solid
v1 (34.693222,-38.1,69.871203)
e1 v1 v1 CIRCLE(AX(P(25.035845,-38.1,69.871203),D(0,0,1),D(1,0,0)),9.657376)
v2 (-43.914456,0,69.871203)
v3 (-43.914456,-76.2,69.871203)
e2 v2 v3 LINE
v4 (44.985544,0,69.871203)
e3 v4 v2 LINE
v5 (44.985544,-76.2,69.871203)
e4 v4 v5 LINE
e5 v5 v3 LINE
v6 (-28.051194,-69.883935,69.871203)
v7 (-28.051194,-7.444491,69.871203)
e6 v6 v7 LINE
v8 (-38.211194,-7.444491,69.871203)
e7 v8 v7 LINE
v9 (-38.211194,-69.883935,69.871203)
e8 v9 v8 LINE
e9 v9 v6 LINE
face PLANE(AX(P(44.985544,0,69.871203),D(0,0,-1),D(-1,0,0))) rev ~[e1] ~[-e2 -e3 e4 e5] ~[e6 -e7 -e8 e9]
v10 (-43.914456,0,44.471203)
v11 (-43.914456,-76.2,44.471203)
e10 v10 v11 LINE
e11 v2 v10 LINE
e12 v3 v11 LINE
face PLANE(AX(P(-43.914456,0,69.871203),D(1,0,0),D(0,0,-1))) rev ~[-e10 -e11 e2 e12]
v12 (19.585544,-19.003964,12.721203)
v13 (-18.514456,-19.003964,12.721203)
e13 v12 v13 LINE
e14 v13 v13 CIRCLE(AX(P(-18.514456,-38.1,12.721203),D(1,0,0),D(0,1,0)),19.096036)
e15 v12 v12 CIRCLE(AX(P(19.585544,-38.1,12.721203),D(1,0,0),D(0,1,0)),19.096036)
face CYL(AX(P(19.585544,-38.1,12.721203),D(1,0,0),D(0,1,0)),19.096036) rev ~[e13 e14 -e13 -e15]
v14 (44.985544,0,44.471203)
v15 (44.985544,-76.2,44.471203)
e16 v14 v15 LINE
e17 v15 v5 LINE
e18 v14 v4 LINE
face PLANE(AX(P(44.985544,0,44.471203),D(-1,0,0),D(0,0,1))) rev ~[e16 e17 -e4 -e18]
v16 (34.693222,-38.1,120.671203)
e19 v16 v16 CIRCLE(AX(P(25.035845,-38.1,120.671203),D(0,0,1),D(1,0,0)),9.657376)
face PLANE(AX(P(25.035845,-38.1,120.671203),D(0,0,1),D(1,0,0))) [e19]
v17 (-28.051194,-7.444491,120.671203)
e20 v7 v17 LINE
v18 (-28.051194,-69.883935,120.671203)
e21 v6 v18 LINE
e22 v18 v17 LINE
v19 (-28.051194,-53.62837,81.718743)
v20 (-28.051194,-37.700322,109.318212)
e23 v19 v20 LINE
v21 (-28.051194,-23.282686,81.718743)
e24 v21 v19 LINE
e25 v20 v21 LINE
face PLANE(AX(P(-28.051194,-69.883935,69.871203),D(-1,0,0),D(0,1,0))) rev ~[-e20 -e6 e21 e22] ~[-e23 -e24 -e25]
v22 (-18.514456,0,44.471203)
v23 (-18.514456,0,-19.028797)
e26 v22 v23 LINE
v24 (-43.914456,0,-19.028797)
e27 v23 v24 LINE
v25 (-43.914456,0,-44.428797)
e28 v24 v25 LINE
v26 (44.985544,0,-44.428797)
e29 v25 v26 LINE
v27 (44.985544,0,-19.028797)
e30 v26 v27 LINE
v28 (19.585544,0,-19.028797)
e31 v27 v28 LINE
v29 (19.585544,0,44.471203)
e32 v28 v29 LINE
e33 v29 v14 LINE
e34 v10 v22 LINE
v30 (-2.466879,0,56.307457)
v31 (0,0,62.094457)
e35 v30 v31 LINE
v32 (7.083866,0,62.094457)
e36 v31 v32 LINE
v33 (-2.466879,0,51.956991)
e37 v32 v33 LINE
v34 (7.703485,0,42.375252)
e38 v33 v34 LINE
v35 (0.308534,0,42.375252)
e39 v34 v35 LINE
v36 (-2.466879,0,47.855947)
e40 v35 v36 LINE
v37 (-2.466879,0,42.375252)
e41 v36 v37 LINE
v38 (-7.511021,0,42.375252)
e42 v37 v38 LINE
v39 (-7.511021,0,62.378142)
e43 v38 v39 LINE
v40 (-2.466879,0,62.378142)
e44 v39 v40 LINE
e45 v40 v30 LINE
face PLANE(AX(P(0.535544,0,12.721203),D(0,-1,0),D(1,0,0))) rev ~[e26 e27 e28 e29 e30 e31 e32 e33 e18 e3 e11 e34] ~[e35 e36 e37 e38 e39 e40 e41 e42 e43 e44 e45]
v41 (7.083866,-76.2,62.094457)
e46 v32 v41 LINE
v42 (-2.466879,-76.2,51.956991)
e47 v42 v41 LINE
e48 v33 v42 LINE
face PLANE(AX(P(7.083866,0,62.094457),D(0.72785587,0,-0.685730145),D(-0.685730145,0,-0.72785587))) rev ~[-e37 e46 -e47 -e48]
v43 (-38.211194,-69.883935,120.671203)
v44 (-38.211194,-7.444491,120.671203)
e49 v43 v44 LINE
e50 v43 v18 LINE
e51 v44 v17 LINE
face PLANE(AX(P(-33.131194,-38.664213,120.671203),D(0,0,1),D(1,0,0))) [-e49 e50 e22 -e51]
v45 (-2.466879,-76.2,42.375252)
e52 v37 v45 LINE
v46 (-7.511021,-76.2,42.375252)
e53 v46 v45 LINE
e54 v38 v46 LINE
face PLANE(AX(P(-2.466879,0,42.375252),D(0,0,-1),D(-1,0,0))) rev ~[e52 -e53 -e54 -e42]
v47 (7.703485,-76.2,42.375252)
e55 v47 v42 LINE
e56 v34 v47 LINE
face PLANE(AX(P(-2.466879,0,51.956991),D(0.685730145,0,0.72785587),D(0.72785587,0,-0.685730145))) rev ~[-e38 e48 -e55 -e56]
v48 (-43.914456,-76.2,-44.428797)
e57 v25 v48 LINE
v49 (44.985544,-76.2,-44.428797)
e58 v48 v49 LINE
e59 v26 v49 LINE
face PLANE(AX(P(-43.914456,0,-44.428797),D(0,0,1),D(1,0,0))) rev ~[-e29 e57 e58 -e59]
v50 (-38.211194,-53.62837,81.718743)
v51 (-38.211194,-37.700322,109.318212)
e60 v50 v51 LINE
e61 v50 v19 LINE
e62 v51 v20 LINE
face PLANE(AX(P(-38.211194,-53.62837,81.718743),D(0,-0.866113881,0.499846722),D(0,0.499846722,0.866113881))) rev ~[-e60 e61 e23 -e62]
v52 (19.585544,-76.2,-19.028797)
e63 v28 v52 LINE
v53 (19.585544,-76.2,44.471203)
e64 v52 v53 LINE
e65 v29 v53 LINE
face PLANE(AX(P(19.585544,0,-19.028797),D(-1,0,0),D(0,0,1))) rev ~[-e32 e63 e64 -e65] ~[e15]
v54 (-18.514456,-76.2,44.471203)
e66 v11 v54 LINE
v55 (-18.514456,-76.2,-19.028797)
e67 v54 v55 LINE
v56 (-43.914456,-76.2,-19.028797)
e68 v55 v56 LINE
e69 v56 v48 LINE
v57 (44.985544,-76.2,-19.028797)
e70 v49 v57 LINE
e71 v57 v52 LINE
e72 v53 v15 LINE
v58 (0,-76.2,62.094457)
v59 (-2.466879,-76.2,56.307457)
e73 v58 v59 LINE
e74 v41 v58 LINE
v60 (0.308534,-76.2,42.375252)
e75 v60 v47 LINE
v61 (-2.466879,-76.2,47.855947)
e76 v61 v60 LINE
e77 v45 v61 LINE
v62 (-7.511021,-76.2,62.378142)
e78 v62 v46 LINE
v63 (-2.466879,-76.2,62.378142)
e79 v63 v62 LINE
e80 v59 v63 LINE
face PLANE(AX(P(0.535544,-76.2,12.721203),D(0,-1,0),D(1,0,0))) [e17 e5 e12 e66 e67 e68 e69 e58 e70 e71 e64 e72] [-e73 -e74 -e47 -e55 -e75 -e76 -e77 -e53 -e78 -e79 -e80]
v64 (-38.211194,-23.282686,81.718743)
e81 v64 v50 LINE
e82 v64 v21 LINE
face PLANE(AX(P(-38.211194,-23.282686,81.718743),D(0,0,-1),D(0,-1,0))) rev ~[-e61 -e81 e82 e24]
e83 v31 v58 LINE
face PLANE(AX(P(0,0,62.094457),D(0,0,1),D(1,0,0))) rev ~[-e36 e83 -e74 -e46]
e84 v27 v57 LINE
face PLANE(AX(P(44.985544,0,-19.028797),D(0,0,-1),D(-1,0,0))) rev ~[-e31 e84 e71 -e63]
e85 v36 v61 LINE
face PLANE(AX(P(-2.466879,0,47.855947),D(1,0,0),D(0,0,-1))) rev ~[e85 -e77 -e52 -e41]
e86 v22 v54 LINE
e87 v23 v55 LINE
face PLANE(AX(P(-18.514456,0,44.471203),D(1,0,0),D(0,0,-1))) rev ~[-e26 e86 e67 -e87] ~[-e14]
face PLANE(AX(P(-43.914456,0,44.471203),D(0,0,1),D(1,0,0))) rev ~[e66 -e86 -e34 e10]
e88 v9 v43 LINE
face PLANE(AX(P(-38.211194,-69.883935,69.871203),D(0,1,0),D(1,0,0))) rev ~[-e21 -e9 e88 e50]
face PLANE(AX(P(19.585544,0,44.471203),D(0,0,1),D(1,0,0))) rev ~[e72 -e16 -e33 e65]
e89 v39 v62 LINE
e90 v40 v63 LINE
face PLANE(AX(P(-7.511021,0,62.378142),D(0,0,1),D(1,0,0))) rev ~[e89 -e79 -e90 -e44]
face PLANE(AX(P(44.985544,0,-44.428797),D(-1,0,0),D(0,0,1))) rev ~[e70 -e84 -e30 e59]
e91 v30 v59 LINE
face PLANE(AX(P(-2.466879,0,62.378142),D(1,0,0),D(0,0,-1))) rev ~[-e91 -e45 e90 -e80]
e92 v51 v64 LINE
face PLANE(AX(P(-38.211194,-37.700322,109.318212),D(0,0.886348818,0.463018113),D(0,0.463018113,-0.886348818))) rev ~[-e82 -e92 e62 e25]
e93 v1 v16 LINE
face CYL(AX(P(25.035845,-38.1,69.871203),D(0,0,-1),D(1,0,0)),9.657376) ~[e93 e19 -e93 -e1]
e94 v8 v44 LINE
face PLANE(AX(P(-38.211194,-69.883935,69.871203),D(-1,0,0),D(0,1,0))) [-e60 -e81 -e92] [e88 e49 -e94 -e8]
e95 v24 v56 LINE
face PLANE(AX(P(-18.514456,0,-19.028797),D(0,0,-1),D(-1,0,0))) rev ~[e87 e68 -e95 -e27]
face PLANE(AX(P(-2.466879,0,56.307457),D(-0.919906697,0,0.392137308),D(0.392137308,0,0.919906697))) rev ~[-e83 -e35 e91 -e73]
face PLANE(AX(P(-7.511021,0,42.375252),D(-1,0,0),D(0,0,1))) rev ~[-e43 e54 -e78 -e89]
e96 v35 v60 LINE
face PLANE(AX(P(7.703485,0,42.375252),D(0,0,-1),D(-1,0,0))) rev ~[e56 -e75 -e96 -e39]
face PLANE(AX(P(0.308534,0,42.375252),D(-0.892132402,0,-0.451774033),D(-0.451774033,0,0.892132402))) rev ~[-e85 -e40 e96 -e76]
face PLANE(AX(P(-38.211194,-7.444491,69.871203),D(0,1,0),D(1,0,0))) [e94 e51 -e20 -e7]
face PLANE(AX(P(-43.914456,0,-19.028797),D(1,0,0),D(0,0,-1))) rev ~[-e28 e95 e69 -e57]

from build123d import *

# Parameters (mm, degrees)
F1_DEPTH  = 76.2
F2_R      = 19.096035609
F3_DEPTH  = 47.498
F4_W      = 10.16
F4_H      = 62.4394440092
F5_DEPTH  = 50.8
F7_DEPTH  = 25.4
F9_DEPTH  = 96.52
F10_R     = 9.6573764136
F11_DEPTH = 50.8


# Not quite as in the source:
# - a feature names something its author has since deleted; it is built from what else it names


with BuildPart() as f1:
    # F0 (on Front) → F1 (new body)
    with BuildSketch(Plane.XZ):
        Polygon((-43.9144560635, -19.0287967878), (-43.9144560635, -44.4287967878), (44.9855439365, -44.4287967878), (44.9855439365, -19.0287967878), (19.5855439365, -19.0287967878), (19.5855439365, 44.4712032122), (44.9855439365, 44.4712032122), (44.9855439365, 69.8712032122), (-43.9144560635, 69.8712032122), (-43.9144560635, 44.4712032122), (-18.5144560635, 44.4712032122), (-18.5144560635, -19.0287967878), align=None)
    extrude(amount=F1_DEPTH)

    # F2 (on face) → F3 (cut)
    with BuildSketch(Plane.YZ.offset(19.5855439365)):
        with Locations((-38.1, 12.7212032122)):
            Circle(F2_R)
    extrude(amount=-F3_DEPTH, mode=Mode.SUBTRACT)

    # F4 (on face) → F5 (join)
    with BuildSketch(Plane.XY.offset(69.8712032122)):
        with Locations((-33.1311938035, -38.6642131489)):
            Rectangle(F4_W, F4_H)
    extrude(amount=F5_DEPTH)

    # F6 (on face) → F7 (cut)
    with BuildSketch(Plane(origin=(-38.2111938035, 0, 0), x_dir=(0, -1, 0), z_dir=(-1, 0, 0))):
        Polygon((53.6283701658, 81.7187428474), (37.7003215253, 109.3182116747), (23.2826862484, 81.7187428474), align=None)
    extrude(amount=-F7_DEPTH, mode=Mode.SUBTRACT)

    # F8 (on face) → F9 (cut)
    with BuildSketch(Plane(origin=(0, 0, 0), x_dir=(-1, 0, 0), z_dir=(0, 1, 0))):
        Polygon((7.511020638, 42.3752516508), (7.511020638, 62.378142029), (2.4668793194, 62.378142029), (2.4668793194, 56.307456918), (0, 62.0944574475), (-7.0838662127, 62.0944574475), (2.4668793194, 51.9569911986), (-7.7034849674, 42.3752516508), (-0.3085337383, 42.3752516508), (2.4668793194, 47.8559471667), (2.4668793194, 42.3752516508), align=None)
    extrude(amount=-F9_DEPTH, mode=Mode.SUBTRACT)

    # F10 (on face) → F11 (join)
    with BuildSketch(Plane.XY.offset(69.8712032122)):
        with Locations((25.0358451158, -38.1)):
            Circle(F10_R)
    extrude(amount=F11_DEPTH)


solid = f1.part
